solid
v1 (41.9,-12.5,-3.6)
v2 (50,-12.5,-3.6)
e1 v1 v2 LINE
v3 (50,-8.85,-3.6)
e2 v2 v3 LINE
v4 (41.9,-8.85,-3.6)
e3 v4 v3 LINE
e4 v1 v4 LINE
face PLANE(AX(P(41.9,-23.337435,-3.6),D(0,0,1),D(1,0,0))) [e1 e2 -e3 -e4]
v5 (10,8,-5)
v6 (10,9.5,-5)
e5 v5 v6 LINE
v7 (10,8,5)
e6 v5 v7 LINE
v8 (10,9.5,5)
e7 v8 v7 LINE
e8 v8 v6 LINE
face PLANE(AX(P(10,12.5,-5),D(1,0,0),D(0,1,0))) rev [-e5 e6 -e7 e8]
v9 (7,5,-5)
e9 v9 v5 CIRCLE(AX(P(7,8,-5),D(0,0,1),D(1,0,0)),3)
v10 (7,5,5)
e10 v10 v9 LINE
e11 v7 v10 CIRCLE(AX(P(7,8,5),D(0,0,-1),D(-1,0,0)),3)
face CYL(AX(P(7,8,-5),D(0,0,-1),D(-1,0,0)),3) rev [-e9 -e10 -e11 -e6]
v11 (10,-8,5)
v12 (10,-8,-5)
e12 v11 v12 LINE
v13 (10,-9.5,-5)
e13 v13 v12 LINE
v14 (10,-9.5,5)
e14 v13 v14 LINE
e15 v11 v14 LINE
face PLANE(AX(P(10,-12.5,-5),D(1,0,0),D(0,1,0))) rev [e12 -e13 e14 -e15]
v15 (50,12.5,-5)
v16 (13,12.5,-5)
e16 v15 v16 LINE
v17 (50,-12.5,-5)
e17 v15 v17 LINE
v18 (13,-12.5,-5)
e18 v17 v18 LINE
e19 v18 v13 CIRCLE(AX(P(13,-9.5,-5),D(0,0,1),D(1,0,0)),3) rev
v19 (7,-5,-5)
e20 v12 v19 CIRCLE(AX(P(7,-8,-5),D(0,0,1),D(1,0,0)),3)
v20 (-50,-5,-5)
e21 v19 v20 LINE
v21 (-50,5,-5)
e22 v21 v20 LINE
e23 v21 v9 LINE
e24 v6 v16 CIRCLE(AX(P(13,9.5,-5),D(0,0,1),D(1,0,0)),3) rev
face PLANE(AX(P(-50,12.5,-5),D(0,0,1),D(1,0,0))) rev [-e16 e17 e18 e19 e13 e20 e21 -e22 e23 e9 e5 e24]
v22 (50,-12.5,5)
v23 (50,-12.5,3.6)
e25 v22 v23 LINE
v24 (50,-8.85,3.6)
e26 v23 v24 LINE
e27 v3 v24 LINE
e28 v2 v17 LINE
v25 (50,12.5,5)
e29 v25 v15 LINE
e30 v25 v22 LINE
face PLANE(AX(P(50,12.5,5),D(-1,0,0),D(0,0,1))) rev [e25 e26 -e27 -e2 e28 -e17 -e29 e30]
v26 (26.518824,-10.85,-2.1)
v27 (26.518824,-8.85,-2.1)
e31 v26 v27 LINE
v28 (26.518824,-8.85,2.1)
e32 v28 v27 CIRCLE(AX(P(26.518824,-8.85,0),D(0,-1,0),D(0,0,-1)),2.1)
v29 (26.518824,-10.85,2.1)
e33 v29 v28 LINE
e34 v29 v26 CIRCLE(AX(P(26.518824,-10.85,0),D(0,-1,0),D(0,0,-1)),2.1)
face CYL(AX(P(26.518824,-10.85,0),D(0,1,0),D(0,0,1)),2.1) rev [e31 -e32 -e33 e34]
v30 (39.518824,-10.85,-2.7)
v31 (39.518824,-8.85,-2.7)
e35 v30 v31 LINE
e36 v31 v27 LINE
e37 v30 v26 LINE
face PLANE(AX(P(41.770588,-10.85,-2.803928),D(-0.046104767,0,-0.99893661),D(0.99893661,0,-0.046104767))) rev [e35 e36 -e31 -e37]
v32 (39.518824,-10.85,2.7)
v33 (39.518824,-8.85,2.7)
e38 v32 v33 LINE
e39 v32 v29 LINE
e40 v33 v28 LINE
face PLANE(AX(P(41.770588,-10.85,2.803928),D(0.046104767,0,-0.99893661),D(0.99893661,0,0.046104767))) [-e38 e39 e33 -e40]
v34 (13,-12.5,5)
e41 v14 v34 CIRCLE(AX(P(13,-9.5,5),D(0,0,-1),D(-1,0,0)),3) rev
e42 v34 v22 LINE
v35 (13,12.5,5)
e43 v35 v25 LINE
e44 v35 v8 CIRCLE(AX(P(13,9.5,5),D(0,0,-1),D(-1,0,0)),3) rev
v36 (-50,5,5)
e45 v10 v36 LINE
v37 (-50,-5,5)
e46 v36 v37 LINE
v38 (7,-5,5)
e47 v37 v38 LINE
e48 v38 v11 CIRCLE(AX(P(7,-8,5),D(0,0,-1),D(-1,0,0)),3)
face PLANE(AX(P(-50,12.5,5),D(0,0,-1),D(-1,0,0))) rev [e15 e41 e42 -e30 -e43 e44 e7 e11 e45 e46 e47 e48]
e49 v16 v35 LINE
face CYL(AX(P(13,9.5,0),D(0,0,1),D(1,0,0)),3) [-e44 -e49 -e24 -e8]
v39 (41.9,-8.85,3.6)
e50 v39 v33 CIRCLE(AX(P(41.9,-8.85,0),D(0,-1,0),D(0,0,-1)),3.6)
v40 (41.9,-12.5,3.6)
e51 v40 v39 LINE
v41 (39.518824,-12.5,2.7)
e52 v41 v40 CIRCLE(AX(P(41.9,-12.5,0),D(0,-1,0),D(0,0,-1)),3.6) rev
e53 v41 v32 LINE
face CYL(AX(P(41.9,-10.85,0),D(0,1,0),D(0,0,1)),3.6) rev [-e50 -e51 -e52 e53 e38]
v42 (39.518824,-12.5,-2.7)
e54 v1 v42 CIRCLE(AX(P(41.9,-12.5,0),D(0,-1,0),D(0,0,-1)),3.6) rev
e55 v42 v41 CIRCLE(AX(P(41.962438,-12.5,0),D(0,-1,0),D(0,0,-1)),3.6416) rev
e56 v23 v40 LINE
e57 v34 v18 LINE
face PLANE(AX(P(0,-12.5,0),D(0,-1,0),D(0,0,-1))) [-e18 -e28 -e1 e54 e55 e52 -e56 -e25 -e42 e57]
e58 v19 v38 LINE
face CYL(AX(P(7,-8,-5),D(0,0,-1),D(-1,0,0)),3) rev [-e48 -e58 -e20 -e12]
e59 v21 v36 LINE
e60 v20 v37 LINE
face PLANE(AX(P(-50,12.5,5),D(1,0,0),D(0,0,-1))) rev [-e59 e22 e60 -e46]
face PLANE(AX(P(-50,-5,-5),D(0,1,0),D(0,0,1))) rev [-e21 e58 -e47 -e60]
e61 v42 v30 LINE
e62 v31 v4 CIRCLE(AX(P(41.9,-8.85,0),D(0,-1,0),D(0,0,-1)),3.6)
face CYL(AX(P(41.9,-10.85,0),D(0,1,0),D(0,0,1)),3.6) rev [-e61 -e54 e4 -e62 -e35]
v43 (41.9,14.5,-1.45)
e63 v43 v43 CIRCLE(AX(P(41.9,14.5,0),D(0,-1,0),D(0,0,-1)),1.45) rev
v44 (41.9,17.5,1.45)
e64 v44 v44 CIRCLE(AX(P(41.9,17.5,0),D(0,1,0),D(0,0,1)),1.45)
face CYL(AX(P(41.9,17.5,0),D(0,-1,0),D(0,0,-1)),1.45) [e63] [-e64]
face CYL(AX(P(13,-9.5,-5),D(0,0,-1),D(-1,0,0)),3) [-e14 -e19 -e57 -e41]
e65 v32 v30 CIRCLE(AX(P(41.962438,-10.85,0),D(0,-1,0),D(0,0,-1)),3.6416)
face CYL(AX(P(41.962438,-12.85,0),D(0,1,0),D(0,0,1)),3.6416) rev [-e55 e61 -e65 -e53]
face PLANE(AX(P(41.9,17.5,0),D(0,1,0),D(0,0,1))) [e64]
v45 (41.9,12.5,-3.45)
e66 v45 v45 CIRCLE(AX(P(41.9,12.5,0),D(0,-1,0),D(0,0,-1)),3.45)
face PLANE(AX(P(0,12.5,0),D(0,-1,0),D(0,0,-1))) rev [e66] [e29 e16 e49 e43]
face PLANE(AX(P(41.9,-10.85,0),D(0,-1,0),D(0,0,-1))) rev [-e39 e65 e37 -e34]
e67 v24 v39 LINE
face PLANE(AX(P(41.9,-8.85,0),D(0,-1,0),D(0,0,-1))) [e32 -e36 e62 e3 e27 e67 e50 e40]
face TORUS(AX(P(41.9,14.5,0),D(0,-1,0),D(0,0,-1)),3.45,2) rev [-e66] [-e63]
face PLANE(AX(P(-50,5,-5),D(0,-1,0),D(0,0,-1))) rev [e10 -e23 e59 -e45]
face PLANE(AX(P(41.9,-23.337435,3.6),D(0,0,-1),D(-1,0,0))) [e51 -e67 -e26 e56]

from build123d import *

# Parameters (mm, degrees)
SKETCH2_W               = 100
SKETCH2_H               = 10
BOSS_EXTRUDE2_DEPTH     = 12.5
CAVITY1_START           = -10.85
CAVITY1_OUTLINE_R       = 1.325
CAVITY1_DEPTH           = 2
CAVITY1_START_2         = -12.5
CAVITY1_2_OUTLINE_R     = 2.1
CAVITY1_2_DEPTH         = 1.65
CUT_EXTRUDE1_START      = -3.65
SKETCH3_R               = 2.1
CUT_EXTRUDE1_DEPTH      = 3.65
SKETCH4_W               = 8.1
SKETCH4_H               = 7.2
CUT_EXTRUDE2_DEPTH      = 3.65
SKETCH5_R               = 1.45
BOSS_EXTRUDE3_DEPTH     = 5
FILLET1_R               = 2
CUT_EXTRUDE3_DEPTH      = 54.909646632
CUT_EXTRUDE3_DEPTH_BACK = 54.909646632
SKETCH6_W               = 60
SKETCH6_H               = 7.5
FILLET2_R               = 3


# Read off the part's stored shape, not the designer's step: Cavity1
with BuildPart() as part:
    # Sketch2 → Boss-Extrude2 (new, symmetric)
    with BuildSketch(Plane(origin=(0, 0, 0), x_dir=(1, 0, 0), z_dir=(0, 1, 0))):
        Rectangle(SKETCH2_W, SKETCH2_H)
    extrude(amount=BOSS_EXTRUDE2_DEPTH, both=True)

    # Cavity1 outline → Cavity1 (cut)
    with BuildSketch(Plane(origin=(0, 0, 0), x_dir=(1, 0, 0), z_dir=(0, 1, 0)).offset(CAVITY1_START)):
        with BuildLine():
            Line((26.51882382, -2.1), (39.51882382, -2.7))
            ThreePointArc((39.51882382, -2.7), (45.5, 0), (39.51882382, 2.7))
            Line((39.51882382, 2.7), (26.51882382, 2.1))
            ThreePointArc((26.51882382, 2.1), (24.41882382, 0), (26.51882382, -2.1))
        make_face()
        with Locations((41.9, 0)):
            Circle(CAVITY1_OUTLINE_R, mode=Mode.SUBTRACT)
    extrude(amount=CAVITY1_DEPTH, mode=Mode.SUBTRACT)

    # Cavity1 2 outline → Cavity1 2 (cut)
    with BuildSketch(Plane(origin=(0, 0, 0), x_dir=(1, 0, 0), z_dir=(0, 1, 0)).offset(CAVITY1_START_2)):
        with BuildLine():
            ThreePointArc((39.51882382, -2.7), (45.5, 0), (39.51882382, 2.7))
            ThreePointArc((39.51882382, 2.7), (38.320838024, 0), (39.51882382, -2.7))
        make_face()
        with Locations((41.9, 0)):
            Circle(CAVITY1_2_OUTLINE_R, mode=Mode.SUBTRACT)
    extrude(amount=CAVITY1_2_DEPTH, mode=Mode.SUBTRACT)

    # Sketch3 → Cut-Extrude1 (cut)
    with BuildSketch(Plane.XZ.offset(12.5).offset(CUT_EXTRUDE1_START)):
        with Locations((41.9, 0)):
            Circle(SKETCH3_R)
    extrude(amount=CUT_EXTRUDE1_DEPTH, mode=Mode.SUBTRACT)

    # Sketch4 → Cut-Extrude2 (cut)
    with BuildSketch(Plane.XZ.offset(8.85)):
        with Locations((45.95, 0)):
            Rectangle(SKETCH4_W, SKETCH4_H)
    extrude(amount=CUT_EXTRUDE2_DEPTH, mode=Mode.SUBTRACT)

    # Sketch5 → Boss-Extrude3 (add)
    with BuildSketch(Plane(origin=(0, 12.5, 0), x_dir=(1, 0, 0), z_dir=(0, 1, 0))):
        with Locations(Location((41.9, 0, 0), (0, 0, 90))):
            Circle(SKETCH5_R)
    extrude(amount=BOSS_EXTRUDE3_DEPTH)

    # Fillet1
    fillet1_edges = [part.edges().sort_by_distance(p)[0] for p in [
        (41.9, 12.5, 1.45),
    ]]
    fillet(fillet1_edges, radius=FILLET1_R)

    # Sketch6 → Cut-Extrude3 (cut, two sides: drawn at the far end of the back side and taken through both)
    with BuildSketch(Plane.XY.offset(5).offset(-CUT_EXTRUDE3_DEPTH_BACK)):
        with Locations((-20, 8.75)):
            Rectangle(SKETCH6_W, SKETCH6_H)
        with Locations((-20, -8.75)):
            Rectangle(SKETCH6_W, SKETCH6_H)
    extrude(amount=CUT_EXTRUDE3_DEPTH + CUT_EXTRUDE3_DEPTH_BACK, mode=Mode.SUBTRACT)

    # Fillet2
    fillet2_edges = [part.edges().sort_by_distance(p)[0] for p in [
        (10, 5, 0),
        (10, 12.5, 0),
        (10, -12.5, 0),
        (10, -5, 0),
    ]]
    fillet(fillet2_edges, radius=FILLET2_R)


solid = part.part
